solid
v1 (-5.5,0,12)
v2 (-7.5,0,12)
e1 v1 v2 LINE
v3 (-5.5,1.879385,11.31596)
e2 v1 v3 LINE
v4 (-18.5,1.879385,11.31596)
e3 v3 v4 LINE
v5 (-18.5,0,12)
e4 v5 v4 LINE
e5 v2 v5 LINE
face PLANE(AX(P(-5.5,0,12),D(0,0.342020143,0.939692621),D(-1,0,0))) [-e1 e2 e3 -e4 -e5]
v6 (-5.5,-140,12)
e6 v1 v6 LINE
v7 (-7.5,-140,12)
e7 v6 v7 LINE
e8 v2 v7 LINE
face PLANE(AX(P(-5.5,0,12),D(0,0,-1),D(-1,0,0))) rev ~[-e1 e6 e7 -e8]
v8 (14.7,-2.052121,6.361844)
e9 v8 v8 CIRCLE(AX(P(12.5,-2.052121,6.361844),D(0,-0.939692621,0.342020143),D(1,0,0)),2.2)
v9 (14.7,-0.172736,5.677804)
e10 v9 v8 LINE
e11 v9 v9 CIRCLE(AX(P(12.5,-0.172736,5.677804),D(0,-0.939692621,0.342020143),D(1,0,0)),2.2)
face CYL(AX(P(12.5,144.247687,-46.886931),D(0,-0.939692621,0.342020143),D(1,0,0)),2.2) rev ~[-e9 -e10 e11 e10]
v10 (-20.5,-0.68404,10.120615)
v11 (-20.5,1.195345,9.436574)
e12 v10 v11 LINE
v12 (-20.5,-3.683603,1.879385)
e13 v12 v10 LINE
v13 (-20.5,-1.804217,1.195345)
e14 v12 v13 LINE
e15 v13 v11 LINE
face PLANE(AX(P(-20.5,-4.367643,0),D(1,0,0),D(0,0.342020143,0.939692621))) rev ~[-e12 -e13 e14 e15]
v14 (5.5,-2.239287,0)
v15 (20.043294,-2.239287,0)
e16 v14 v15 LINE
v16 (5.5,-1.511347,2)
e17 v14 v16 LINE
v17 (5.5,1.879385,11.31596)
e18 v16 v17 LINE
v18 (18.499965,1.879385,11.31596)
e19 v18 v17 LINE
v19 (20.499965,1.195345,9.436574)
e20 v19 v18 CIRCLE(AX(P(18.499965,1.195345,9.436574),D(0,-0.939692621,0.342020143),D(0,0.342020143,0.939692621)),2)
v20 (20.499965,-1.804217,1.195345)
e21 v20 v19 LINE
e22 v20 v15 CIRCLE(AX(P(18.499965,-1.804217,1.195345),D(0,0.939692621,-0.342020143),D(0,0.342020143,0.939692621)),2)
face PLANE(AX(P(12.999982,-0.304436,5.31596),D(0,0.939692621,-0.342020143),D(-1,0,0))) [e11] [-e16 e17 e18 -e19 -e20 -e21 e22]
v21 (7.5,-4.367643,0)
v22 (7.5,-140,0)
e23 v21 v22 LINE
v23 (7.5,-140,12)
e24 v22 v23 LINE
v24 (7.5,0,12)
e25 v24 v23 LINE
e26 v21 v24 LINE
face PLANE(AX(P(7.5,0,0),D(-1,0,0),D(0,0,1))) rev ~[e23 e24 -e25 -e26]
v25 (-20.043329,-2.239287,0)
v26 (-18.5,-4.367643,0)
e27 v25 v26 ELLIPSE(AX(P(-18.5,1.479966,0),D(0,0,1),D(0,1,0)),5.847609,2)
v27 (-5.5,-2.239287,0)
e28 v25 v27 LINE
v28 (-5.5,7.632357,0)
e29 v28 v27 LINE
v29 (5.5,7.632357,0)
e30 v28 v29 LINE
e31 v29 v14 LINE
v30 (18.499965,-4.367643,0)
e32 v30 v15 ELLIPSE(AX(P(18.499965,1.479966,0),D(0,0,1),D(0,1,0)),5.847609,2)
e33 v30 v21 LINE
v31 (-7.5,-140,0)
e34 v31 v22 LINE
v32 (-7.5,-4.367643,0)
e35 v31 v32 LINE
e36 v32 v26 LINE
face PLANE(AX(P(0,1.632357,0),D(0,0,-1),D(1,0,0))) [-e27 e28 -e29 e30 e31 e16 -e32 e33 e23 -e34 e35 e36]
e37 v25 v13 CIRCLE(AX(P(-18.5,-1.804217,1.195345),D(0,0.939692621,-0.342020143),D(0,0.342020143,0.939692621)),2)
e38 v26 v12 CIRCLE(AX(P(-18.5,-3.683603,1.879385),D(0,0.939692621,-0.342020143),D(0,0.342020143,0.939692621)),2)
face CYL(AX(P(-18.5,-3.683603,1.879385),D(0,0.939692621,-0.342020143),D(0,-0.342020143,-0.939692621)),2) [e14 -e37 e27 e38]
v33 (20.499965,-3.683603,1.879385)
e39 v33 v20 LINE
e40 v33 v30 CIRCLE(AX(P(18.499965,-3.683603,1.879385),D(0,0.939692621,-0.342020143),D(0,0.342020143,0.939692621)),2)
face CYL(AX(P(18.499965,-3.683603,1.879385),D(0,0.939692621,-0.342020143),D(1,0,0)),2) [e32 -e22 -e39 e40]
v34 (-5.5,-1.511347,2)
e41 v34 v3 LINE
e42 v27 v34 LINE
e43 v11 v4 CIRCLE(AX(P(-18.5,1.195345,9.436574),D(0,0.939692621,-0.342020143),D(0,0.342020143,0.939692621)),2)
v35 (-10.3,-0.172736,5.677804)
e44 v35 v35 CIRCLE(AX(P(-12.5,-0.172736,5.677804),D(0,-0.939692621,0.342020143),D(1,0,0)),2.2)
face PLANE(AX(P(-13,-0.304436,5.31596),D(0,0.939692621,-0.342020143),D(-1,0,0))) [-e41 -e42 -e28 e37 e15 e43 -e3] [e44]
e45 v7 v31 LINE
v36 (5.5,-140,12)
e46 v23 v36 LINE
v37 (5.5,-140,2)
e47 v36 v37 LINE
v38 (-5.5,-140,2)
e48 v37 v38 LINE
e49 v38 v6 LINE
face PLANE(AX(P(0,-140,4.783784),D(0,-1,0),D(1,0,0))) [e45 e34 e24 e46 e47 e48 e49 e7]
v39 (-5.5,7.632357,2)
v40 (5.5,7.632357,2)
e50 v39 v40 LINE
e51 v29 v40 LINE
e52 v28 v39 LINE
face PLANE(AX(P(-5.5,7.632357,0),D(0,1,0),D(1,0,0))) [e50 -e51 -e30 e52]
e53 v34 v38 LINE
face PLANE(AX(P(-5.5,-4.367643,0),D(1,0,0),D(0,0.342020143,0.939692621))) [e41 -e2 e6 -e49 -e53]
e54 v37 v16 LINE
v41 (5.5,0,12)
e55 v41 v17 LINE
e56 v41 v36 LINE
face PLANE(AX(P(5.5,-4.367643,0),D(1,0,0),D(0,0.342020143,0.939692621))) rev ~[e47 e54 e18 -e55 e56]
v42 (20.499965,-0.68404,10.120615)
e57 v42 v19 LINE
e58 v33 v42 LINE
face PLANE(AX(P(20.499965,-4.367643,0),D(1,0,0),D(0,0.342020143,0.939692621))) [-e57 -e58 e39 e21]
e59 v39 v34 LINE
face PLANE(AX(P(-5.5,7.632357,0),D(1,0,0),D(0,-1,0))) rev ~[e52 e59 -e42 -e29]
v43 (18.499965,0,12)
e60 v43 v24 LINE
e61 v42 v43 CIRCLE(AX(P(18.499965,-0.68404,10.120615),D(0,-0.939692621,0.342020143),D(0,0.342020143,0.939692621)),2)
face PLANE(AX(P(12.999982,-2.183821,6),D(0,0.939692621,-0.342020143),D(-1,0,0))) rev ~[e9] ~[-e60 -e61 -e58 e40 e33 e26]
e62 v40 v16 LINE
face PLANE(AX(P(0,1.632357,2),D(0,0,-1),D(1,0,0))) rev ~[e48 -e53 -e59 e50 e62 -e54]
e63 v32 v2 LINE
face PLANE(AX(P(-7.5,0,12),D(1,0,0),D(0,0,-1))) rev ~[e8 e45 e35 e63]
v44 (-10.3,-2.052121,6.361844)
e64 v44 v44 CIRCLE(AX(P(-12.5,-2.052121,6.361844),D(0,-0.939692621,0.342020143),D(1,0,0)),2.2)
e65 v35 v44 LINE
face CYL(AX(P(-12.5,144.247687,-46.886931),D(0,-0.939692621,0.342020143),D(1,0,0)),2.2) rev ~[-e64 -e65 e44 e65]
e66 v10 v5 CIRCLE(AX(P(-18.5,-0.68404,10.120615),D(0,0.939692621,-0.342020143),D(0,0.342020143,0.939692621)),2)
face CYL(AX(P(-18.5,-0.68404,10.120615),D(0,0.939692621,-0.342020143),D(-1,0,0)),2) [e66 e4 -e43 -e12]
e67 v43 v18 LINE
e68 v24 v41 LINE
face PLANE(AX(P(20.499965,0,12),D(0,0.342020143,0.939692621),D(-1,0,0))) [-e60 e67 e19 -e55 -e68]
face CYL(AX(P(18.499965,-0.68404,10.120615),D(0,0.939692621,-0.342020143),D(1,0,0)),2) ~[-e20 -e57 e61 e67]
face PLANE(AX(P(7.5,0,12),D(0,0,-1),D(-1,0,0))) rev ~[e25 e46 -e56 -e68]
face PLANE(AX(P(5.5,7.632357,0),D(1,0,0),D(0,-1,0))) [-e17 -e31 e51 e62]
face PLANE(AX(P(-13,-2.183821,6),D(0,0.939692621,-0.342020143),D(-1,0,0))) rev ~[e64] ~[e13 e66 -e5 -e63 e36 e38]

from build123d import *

# Parameters (mm, degrees)
F1_DEPTH  = 140
F3_DEPTH  = 25
F4_W      = 14.9999646693
F4_H      = 12.7701332697
F4_W_2    = 15
F5_DEPTH  = 2
F6_R      = 2
F7_W      = 11
F7_H      = 12
F8_DEPTH  = 2
F10_DEPTH = 50
F12_D     = 4.4


with BuildPart() as f1:
    # F0 (on Front) → F1 (new body)
    with BuildSketch(Plane.XZ):
        Polygon((-5.5, 12), (-7.5, 12), (-7.5, 0), (7.5, 0), (7.5, 12), (5.5, 12), (5.5, 2), (-5.5, 2), align=None)
    extrude(amount=F1_DEPTH)

    # F2 (on face) → F3 (cut)
    with BuildSketch(Plane(origin=(-7.5, 0, 0), x_dir=(0, -1, 0), z_dir=(-1, 0, 0))):
        Polygon((4.3676428112, 0), (0, 12), (0, 0), align=None)
    extrude(amount=-F3_DEPTH, mode=Mode.SUBTRACT)

    # F4 (on face) → F5 (join)
    with BuildSketch(Plane(origin=(0, -3.8567256581, 1.4037333413), x_dir=(-1, 0, 0), z_dir=(0, 0.9396926208, -0.3420201433))):
        with Locations((-12.9999823347, 4.8912448146)):
            Rectangle(F4_W, F4_H)
        with Locations((13, 4.8912448146)):
            Rectangle(F4_W_2, F4_H)
    extrude(amount=F5_DEPTH)

    # F6
    f6_edges = [f1.edges().sort_by_distance(p)[0] for p in [
        (20.499965, 0.939693, 11.65798),
        (-20.5, 0.939693, 11.65798),
        (20.499965, -3.42795, -0.34202),
        (-20.5, -3.42795, -0.34202),
    ]]
    fillet(f6_edges, radius=F6_R)

    # F7 (on face) → F8 (join)
    with BuildSketch(Plane(origin=(0, 0, 0), x_dir=(1, 0, 0), z_dir=(0, 0, -1))):
        with Locations((0, -1.6323571888)):
            Rectangle(F7_W, F7_H)
    extrude(amount=-F8_DEPTH)

    # F9 (on face) → F10 (cut, symmetric)
    with BuildSketch(Plane(origin=(-5.5, 0, 0), x_dir=(0, -1, 0), z_dir=(-1, 0, 0))):
        Polygon((2.2392872662, 0), (-7.6323571888, 0), (-7.6323571888, -1.849311986), (7.0655047894, -1.849311986), (7.0655047894, 0), align=None)
    extrude(amount=F10_DEPTH, both=True, mode=Mode.SUBTRACT)

    # F12 (through all)
    with Locations(Plane(origin=(0, -1.9773404165, 0.7196930546), x_dir=(-1, 0, 0), z_dir=(0, 0.9396926208, -0.3420201433))):
        with Locations((-12.5, 5.2763114494), (12.5, 5.2763114494)):
            Hole(F12_D / 2)


solid = f1.part
